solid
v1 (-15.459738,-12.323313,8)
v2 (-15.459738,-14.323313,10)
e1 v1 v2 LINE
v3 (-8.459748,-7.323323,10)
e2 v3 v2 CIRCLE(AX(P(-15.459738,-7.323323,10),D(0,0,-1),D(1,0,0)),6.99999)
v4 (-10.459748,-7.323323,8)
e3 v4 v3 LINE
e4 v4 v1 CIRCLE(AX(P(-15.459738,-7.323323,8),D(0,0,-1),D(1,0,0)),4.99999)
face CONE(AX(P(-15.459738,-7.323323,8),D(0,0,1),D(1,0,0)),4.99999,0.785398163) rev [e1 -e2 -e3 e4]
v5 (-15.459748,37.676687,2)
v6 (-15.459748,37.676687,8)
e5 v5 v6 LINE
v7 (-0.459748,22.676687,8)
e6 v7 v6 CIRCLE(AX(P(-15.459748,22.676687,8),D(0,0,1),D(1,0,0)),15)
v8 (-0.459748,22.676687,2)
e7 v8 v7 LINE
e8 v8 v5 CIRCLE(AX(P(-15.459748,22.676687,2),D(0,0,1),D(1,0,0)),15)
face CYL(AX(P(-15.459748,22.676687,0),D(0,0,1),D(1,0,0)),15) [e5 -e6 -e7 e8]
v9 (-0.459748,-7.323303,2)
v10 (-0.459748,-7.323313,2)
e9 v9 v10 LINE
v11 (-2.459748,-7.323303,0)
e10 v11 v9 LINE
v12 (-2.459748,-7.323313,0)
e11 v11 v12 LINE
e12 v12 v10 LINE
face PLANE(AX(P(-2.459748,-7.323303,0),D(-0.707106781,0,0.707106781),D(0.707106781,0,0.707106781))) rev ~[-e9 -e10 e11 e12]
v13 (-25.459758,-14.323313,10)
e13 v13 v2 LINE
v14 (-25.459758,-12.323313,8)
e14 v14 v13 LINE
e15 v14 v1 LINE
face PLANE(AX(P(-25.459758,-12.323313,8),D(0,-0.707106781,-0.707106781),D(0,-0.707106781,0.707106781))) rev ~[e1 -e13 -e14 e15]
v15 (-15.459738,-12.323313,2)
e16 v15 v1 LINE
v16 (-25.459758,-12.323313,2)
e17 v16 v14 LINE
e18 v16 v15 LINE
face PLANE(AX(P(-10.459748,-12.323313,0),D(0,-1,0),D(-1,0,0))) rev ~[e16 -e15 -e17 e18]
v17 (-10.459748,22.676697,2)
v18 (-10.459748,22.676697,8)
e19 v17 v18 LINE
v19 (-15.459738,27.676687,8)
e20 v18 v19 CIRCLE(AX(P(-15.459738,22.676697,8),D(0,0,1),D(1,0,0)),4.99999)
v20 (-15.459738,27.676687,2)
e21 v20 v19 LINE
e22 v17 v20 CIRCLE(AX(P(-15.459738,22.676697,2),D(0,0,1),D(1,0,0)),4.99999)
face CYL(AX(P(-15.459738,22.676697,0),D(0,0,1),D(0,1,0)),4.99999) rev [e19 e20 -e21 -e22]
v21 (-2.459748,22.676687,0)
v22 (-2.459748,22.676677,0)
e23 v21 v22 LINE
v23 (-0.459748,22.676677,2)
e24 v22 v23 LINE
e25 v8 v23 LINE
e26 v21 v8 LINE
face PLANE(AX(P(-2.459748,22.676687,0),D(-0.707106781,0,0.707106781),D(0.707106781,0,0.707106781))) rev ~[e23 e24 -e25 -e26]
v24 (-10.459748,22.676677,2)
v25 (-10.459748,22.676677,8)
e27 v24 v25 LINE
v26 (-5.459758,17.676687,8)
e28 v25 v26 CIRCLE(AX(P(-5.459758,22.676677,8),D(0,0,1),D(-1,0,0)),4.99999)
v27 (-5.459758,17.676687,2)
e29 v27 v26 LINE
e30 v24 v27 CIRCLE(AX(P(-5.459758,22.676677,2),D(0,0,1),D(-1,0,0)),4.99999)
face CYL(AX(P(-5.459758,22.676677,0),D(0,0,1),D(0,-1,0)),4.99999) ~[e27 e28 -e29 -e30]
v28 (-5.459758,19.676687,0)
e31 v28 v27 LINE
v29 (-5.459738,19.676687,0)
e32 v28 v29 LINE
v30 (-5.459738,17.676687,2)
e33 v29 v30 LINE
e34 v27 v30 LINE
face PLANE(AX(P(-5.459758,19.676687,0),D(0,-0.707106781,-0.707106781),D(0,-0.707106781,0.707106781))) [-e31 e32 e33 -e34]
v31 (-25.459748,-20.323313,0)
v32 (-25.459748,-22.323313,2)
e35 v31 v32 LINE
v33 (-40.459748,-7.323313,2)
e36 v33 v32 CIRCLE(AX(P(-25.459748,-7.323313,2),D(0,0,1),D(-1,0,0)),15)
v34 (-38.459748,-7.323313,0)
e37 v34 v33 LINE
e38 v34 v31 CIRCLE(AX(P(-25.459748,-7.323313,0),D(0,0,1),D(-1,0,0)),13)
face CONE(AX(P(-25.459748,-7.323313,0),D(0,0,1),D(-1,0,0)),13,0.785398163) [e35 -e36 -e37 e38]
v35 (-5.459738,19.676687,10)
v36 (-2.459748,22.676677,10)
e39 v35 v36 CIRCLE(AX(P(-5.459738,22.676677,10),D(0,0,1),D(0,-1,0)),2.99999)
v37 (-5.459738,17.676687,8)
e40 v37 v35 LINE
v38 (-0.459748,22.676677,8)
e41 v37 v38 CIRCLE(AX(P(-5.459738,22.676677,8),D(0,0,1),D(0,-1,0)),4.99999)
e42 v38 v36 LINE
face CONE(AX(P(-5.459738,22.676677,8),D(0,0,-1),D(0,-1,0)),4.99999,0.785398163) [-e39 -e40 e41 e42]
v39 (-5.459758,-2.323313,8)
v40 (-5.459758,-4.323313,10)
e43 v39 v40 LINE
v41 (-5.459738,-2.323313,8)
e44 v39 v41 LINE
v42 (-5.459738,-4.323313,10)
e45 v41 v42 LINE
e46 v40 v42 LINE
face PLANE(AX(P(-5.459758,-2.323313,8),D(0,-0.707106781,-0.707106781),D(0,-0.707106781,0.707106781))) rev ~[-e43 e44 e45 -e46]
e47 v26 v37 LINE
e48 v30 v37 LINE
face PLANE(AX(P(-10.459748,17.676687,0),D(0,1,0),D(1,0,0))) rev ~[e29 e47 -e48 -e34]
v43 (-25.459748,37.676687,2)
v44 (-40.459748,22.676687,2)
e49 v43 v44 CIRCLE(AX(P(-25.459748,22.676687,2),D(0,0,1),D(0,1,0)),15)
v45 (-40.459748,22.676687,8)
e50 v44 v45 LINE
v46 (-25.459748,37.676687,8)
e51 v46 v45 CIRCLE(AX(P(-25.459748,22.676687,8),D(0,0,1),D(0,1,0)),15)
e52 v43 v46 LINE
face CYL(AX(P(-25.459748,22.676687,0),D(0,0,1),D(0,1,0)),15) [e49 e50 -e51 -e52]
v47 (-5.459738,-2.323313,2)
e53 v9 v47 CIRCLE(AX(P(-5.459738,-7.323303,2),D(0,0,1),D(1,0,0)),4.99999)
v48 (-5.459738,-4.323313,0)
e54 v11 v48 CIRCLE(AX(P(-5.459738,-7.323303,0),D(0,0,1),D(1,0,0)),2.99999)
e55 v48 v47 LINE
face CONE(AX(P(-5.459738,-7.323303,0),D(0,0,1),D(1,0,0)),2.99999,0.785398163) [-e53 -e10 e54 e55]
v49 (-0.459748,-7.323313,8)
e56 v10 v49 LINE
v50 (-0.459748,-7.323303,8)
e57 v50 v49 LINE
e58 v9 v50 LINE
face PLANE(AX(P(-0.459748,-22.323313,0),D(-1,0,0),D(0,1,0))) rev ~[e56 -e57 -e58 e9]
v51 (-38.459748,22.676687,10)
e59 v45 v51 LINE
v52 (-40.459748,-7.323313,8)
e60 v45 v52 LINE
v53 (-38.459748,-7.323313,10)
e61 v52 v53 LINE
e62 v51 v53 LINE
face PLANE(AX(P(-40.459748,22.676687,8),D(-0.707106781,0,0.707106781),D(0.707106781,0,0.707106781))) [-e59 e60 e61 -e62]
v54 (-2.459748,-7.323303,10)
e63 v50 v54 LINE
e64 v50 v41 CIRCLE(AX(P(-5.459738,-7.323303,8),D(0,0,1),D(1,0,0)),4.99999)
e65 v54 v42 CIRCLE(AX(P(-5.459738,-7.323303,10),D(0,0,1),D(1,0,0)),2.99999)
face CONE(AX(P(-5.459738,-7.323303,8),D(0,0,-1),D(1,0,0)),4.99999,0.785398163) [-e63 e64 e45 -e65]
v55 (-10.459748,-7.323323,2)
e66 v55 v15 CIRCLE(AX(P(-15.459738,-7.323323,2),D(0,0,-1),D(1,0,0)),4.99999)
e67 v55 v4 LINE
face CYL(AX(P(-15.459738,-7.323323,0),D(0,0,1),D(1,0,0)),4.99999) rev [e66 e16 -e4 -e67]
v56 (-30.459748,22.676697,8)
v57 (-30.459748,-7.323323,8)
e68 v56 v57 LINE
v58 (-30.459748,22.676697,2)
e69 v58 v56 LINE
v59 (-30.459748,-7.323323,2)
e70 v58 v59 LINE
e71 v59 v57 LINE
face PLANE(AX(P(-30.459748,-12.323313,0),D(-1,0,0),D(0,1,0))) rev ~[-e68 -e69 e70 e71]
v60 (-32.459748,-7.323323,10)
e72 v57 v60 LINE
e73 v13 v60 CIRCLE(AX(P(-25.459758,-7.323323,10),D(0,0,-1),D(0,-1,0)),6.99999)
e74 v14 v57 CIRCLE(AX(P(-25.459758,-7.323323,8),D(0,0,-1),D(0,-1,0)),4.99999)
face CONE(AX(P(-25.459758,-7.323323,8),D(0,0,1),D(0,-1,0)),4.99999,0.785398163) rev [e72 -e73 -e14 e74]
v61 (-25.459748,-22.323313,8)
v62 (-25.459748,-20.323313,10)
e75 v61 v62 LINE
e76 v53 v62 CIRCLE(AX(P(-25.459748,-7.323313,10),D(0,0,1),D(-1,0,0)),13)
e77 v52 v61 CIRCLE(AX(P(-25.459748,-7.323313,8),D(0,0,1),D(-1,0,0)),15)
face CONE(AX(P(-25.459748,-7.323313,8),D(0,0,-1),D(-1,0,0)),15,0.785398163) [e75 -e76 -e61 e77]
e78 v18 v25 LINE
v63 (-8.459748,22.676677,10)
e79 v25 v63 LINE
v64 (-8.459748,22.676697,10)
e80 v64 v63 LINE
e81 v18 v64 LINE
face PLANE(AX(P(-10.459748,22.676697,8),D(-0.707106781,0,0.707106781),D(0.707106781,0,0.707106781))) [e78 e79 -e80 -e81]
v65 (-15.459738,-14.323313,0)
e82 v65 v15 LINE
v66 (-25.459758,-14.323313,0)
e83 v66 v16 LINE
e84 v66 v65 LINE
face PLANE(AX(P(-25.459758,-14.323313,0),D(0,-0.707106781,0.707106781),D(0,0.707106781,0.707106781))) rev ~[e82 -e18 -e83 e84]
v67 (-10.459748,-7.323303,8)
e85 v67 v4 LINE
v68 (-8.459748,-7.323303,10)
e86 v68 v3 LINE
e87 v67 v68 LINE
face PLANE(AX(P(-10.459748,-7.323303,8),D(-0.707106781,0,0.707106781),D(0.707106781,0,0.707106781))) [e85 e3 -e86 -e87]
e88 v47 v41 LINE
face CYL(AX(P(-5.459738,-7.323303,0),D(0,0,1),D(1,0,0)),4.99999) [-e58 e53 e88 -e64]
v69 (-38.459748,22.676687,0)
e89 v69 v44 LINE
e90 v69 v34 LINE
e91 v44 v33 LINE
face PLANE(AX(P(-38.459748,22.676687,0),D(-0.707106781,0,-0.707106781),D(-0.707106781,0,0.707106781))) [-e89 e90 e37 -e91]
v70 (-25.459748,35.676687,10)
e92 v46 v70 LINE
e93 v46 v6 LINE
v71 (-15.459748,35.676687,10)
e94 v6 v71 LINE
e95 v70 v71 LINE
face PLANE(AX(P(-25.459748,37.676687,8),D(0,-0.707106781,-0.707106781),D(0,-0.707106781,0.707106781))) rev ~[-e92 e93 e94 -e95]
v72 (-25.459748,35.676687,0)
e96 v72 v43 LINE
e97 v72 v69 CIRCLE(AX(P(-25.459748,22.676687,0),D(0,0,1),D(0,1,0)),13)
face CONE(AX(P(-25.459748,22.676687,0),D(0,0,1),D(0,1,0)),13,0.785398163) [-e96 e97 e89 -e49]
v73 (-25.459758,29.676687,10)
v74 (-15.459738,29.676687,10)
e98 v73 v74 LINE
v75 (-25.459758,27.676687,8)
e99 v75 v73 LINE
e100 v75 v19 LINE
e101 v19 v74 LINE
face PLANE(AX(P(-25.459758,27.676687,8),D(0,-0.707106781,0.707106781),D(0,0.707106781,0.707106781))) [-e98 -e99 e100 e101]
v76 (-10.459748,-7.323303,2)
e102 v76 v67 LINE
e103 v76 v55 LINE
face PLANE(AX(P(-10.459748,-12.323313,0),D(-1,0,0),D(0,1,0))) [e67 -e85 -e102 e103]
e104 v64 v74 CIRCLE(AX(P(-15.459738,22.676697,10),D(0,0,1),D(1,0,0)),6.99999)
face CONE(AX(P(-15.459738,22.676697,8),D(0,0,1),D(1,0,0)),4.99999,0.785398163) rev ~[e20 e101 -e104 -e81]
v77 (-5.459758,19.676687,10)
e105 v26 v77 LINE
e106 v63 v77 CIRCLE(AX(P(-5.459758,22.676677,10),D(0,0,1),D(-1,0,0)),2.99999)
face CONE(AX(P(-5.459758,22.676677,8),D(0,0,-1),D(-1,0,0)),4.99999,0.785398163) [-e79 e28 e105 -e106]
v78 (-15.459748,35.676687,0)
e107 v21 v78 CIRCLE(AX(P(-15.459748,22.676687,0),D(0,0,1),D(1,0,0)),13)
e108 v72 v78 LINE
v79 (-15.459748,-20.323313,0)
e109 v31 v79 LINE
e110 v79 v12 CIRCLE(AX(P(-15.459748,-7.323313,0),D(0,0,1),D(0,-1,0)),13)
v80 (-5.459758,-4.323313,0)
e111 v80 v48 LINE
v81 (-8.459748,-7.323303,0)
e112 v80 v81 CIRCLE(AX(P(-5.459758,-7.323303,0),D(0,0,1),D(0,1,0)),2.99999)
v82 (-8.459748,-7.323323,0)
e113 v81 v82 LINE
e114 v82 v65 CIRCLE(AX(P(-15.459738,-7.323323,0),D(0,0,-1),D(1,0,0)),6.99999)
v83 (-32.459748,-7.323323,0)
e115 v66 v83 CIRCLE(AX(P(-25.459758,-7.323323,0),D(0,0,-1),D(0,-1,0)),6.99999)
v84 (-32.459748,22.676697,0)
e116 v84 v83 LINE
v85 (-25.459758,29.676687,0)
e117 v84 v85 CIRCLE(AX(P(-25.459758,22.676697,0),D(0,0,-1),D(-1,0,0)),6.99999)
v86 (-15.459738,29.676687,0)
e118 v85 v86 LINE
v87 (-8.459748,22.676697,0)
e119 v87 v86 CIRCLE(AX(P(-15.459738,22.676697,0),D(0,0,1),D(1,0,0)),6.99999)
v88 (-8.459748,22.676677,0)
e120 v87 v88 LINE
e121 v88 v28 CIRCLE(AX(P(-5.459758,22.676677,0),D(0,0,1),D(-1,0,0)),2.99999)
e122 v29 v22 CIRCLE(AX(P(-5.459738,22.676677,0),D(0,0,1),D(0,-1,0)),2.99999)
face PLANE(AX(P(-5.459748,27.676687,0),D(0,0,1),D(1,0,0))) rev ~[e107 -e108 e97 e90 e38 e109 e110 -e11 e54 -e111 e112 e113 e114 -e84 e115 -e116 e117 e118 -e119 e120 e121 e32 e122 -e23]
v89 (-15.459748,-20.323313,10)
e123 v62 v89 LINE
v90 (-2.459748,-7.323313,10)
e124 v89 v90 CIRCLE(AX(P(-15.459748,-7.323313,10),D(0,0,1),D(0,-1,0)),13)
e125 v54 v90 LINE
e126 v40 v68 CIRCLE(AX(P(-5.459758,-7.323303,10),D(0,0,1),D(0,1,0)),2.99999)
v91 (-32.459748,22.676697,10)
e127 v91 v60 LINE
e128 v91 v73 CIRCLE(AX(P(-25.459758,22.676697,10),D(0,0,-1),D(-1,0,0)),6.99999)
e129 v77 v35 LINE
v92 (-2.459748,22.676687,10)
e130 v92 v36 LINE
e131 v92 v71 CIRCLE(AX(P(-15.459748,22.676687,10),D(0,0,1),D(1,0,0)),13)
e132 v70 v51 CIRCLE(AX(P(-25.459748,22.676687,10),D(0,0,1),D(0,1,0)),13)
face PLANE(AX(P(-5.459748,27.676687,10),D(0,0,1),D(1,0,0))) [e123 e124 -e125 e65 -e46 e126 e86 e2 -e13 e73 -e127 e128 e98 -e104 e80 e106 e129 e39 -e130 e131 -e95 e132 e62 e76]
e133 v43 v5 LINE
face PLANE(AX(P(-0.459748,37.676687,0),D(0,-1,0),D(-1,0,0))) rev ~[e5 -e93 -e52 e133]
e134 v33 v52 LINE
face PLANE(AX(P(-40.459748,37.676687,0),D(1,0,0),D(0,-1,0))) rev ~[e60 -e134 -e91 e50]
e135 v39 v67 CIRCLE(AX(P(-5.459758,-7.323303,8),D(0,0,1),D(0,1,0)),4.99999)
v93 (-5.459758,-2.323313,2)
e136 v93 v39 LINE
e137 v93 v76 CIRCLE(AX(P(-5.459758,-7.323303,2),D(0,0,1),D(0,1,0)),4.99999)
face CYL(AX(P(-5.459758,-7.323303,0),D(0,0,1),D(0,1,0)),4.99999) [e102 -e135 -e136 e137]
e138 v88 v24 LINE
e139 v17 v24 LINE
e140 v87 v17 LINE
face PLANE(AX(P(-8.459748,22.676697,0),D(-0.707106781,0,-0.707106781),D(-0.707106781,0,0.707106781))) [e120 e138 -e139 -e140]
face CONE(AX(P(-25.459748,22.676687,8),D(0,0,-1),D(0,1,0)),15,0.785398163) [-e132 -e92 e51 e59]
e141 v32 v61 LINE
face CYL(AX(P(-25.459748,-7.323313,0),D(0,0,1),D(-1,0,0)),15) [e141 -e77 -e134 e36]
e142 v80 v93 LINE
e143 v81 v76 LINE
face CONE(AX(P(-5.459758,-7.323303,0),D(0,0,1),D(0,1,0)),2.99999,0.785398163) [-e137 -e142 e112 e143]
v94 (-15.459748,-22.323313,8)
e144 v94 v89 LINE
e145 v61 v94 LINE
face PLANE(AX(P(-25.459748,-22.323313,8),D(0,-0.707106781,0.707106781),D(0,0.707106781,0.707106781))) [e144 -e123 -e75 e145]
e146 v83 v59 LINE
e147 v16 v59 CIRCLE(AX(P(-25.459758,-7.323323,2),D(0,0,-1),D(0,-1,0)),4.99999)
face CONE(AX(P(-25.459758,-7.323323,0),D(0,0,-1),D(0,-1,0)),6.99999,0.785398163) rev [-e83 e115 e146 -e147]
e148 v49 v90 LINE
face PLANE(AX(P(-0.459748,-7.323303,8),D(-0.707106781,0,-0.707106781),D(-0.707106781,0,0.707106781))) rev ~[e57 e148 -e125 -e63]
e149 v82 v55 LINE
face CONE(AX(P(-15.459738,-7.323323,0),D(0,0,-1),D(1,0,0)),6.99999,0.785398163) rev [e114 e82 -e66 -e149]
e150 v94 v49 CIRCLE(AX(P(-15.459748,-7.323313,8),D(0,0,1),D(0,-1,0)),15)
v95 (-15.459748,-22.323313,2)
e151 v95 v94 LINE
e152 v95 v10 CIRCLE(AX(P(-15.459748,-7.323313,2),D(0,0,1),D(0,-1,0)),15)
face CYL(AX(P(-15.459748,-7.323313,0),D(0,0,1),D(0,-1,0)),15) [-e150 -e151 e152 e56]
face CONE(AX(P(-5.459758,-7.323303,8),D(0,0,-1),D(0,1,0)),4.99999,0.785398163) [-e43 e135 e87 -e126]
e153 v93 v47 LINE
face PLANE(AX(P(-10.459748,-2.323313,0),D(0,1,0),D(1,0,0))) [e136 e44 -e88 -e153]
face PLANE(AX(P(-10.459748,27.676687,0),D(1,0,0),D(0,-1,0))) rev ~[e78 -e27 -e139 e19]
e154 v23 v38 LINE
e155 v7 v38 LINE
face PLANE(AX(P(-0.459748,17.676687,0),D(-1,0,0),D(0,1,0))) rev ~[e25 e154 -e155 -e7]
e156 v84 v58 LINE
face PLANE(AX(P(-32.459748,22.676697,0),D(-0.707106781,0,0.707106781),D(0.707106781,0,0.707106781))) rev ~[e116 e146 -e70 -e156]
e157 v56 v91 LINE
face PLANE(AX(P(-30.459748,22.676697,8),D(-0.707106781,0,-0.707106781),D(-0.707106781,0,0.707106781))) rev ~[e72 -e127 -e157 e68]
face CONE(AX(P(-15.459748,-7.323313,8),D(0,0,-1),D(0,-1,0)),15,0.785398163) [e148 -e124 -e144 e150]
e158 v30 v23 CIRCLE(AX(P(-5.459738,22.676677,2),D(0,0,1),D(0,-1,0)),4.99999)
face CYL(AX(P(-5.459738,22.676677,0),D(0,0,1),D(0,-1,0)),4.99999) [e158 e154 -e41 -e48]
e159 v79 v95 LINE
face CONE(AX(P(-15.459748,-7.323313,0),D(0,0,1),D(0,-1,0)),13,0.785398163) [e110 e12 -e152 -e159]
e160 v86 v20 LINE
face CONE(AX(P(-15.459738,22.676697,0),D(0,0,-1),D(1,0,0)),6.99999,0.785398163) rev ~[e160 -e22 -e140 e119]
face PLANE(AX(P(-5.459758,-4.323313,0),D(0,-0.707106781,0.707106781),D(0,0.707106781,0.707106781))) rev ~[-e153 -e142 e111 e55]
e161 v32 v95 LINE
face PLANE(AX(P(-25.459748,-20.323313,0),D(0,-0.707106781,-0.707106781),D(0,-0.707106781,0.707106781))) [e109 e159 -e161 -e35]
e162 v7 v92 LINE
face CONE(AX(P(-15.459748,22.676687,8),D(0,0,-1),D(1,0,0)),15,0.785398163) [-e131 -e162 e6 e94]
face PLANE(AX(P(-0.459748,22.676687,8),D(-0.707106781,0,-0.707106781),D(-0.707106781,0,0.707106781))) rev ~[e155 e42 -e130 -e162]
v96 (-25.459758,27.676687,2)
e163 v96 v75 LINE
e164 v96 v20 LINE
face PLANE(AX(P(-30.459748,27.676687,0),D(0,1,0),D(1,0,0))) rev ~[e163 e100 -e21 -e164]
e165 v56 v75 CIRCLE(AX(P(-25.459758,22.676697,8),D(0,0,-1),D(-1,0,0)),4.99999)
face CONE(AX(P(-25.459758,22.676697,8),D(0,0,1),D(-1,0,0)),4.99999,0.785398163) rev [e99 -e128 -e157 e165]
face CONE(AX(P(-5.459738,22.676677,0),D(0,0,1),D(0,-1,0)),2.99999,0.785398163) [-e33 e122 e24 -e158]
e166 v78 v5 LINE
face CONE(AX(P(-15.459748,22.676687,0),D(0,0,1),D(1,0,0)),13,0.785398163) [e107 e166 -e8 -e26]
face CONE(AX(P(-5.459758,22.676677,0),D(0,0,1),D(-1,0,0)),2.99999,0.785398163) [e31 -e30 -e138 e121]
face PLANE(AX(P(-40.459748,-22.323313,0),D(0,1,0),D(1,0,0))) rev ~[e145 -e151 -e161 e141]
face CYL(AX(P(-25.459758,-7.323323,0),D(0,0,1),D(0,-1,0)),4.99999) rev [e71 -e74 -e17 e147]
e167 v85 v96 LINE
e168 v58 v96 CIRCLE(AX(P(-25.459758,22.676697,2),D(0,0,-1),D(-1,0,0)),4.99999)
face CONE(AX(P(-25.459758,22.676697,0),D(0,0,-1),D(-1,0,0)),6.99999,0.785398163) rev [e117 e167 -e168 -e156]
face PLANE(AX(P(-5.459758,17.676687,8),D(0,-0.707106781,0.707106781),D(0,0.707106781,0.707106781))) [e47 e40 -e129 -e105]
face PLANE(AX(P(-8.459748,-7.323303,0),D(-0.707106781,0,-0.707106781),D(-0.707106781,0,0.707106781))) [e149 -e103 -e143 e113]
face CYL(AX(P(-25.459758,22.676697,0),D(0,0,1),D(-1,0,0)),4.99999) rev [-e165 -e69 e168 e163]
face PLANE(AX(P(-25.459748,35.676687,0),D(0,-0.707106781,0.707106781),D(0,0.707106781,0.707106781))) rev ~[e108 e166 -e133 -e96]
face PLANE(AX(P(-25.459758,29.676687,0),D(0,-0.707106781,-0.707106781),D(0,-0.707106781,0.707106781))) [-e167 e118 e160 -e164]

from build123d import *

# Parameters (mm, degrees)
F0_W         = 10
F0_H         = 10
F1_DEPTH     = 10
F2_R         = 4.99999
F3_R         = 15
F4_T1_DEPTH  = 30.00002
F4_T3_DEPTH  = 10
F4_T5_DEPTH  = 1e-05
F4_T7_DEPTH  = 2e-05
F4_T9_DEPTH  = 2e-05
F4_T11_DEPTH = 10.00002
F4_T13_DEPTH = 2e-05
F4_T15_DEPTH = 1e-05
F4_T17_DEPTH = 30
F4_T20_ANGLE = 90
F4_T22_ANGLE = 90
F4_T24_ANGLE = 90
F4_T26_ANGLE = 90
F4_T28_ANGLE = 90
F4_T30_ANGLE = 90
F4_T32_ANGLE = 90
F4_T34_ANGLE = 90
F4_T36_ANGLE = 90
F4_T38_ANGLE = 90
F4_T40_ANGLE = 90
F4_T42_ANGLE = 90
F4_T44_ANGLE = 90
F4_T46_ANGLE = 90
F4_T48_ANGLE = 90
F4_T50_ANGLE = 90
F4_T52_ANGLE = 90
F4_T54_ANGLE = 90
F4_T56_ANGLE = 90
F4_T58_ANGLE = 90
F4_T60_ANGLE = 90
F4_T62_ANGLE = 90
F4_T64_ANGLE = 90
F4_T66_ANGLE = 90


# Not quite as in the source:
# - a fillet or chamfer that OpenCascade refuses, or shapes differently, is made with other operations: its cross-section is extruded or revolved along the edge and cut away or added
# - a fillet or chamfer is up to 0.001 mm smaller than in the source, because OpenCascade refuses the exact size


with BuildPart() as f1:
    # F0 (on Top) → F1 (new body)
    with BuildSketch(Plane.XY):
        Polygon((-10.4597477218, 27.6766866998), (-10.4597477218, 17.6766866998), (-0.4597477218, 17.6766866998), (-0.4597477218, 37.6766866998), (-10.4597477218, 37.6766866998), align=None)
        Polygon((-30.4597477218, 27.6766866998), (-10.4597477218, 27.6766866998), (-10.4597477218, 37.6766866998), (-40.4597477218, 37.6766866998), (-40.4597477218, 27.6766866998), align=None)
        Polygon((-30.4597477218, -12.3233133002), (-30.4597477218, 27.6766866998), (-40.4597477218, 27.6766866998), (-40.4597477218, -22.3233133002), (-30.4597477218, -22.3233133002), align=None)
        Polygon((-10.4597477218, -12.3233133002), (-30.4597477218, -12.3233133002), (-30.4597477218, -22.3233133002), (-0.4597477218, -22.3233133002), (-0.4597477218, -12.3233133002), align=None)
        with Locations((-5.4597477218, -7.3233133002)):
            Rectangle(F0_W, F0_H)
    extrude(amount=F1_DEPTH)

    # F2 (radius 5 in the source; OpenCascade refuses exactly that, so slightly less here)
    f2_edges = [f1.edges().sort_by_distance(p)[0] for p in [
        (-0.459748, 17.676687, 5),
        (-10.459748, 17.676687, 5),
        (-10.459748, 27.676687, 5),
        (-30.459748, 27.676687, 5),
        (-30.459748, -12.323313, 5),
        (-10.459748, -12.323313, 5),
        (-10.459748, -2.323313, 5),
        (-0.459748, -2.323313, 5),
    ]]
    fillet(f2_edges, radius=F2_R)

    # F3
    f3_edges = [f1.edges().sort_by_distance(p)[0] for p in [
        (-0.459748, 37.676687, 5),
        (-40.459748, 37.676687, 5),
        (-0.459748, -22.323313, 5),
        (-40.459748, -22.323313, 5),
    ]]
    fillet(f3_edges, radius=F3_R)

    # F4: chamfer of 2 on 2 edges, made by hand

    # F4_s2 → F4_t1 (cut)
    with BuildSketch(Plane.XZ.offset(-22.6766966998)):
        Polygon((-30.4597477218, 8), (-32.4597477218, 10), (-30.4597477218, 10), align=None)
        Polygon((-32.4597477218, 0), (-30.4597477218, 2), (-30.4597477218, 0), align=None)
    extrude(amount=F4_T1_DEPTH, mode=Mode.SUBTRACT)

    # F4_s4 → F4_t3 (cut)
    with BuildSketch(Plane.YZ.offset(-25.4597477218)):
        Polygon((-20.3233133002, 0), (-22.3233133002, 2), (-22.3233133002, 0), align=None)
        Polygon((35.6766866998, 0), (37.6766866998, 2), (37.6766866998, 0), align=None)
        Polygon((37.6766866998, 8), (35.6766866998, 10), (37.6766866998, 10), align=None)
        Polygon((-22.3233133002, 8), (-20.3233133002, 10), (-22.3233133002, 10), align=None)
    extrude(amount=F4_T3_DEPTH, mode=Mode.SUBTRACT)

    # F4_s6 → F4_t5 (cut)
    with BuildSketch(Plane.XZ.offset(7.3233033002)):
        Polygon((-2.4597477218, 0), (-0.4597477218, 2), (-0.4597477218, 0), align=None)
        Polygon((-0.4597477218, 8), (-2.4597477218, 10), (-0.4597477218, 10), align=None)
    extrude(amount=F4_T5_DEPTH, mode=Mode.SUBTRACT)

    # F4_s8 → F4_t7 (cut)
    with BuildSketch(Plane.YZ.offset(-5.4597577218)):
        Polygon((-4.3233133002, 0), (-2.3233133002, 2), (-2.3233133002, 0), align=None)
        Polygon((19.6766866998, 0), (17.6766866998, 2), (17.6766866998, 0), align=None)
        Polygon((17.6766866998, 8), (19.6766866998, 10), (17.6766866998, 10), align=None)
        Polygon((-2.3233133002, 8), (-4.3233133002, 10), (-2.3233133002, 10), align=None)
    extrude(amount=F4_T7_DEPTH, mode=Mode.SUBTRACT)

    # F4_s10 → F4_t9 (cut)
    with BuildSketch(Plane.XZ.offset(7.3233033002)):
        Polygon((-8.4597477218, 0), (-10.4597477218, 2), (-10.4597477218, 0), align=None)
        Polygon((-10.4597477218, 8), (-8.4597477218, 10), (-10.4597477218, 10), align=None)
    extrude(amount=F4_T9_DEPTH, mode=Mode.SUBTRACT)

    # F4_s12 → F4_t11 (cut)
    with BuildSketch(Plane.YZ.offset(-25.4597577218)):
        Polygon((-14.3233133002, 0), (-12.3233133002, 2), (-12.3233133002, 0), align=None)
        Polygon((29.6766866998, 0), (27.6766866998, 2), (27.6766866998, 0), align=None)
        Polygon((27.6766866998, 8), (29.6766866998, 10), (27.6766866998, 10), align=None)
        Polygon((-12.3233133002, 8), (-14.3233133002, 10), (-12.3233133002, 10), align=None)
    extrude(amount=F4_T11_DEPTH, mode=Mode.SUBTRACT)

    # F4_s14 → F4_t13 (cut)
    with BuildSketch(Plane.XZ.offset(-22.6766966998)):
        Polygon((-8.4597477218, 0), (-10.4597477218, 2), (-10.4597477218, 0), align=None)
        Polygon((-10.4597477218, 8), (-8.4597477218, 10), (-10.4597477218, 10), align=None)
    extrude(amount=F4_T13_DEPTH, mode=Mode.SUBTRACT)

    # F4_s16 → F4_t15 (cut)
    with BuildSketch(Plane.XZ.offset(-22.6766866998)):
        Polygon((-2.4597477218, 0), (-0.4597477218, 2), (-0.4597477218, 0), align=None)
        Polygon((-0.4597477218, 8), (-2.4597477218, 10), (-0.4597477218, 10), align=None)
    extrude(amount=F4_T15_DEPTH, mode=Mode.SUBTRACT)

    # F4_s18 → F4_t17 (cut)
    with BuildSketch(Plane.XZ.offset(-22.6766866998)):
        Polygon((-38.4597477218, 0), (-40.4597477218, 2), (-40.4597477218, 0), align=None)
        Polygon((-40.4597477218, 8), (-38.4597477218, 10), (-40.4597477218, 10), align=None)
    extrude(amount=F4_T17_DEPTH, mode=Mode.SUBTRACT)

    # F4_s19 → F4_t20 (revolve, cut)
    with BuildSketch(Plane.YZ.offset(-15.4597477218)):
        Polygon((-20.3233133002, 0), (-22.3233133002, 2), (-22.3233133002, 0), align=None)
    revolve(axis=Axis((-15.4597477218, -7.3233133002, 0), (0, 0, 1)), revolution_arc=F4_T20_ANGLE, mode=Mode.SUBTRACT)

    # F4_s21 → F4_t22 (revolve, cut)
    with BuildSketch(Plane.XZ.offset(7.3233033002)):
        Polygon((-2.4597477218, 0), (-0.4597477218, 2), (-0.4597477218, 0), align=None)
    revolve(axis=Axis((-5.4597377218, -7.3233033002, 0), (0, 0, 1)), revolution_arc=F4_T22_ANGLE, mode=Mode.SUBTRACT)

    # F4_s23 → F4_t24 (revolve, cut)
    with BuildSketch(Plane.YZ.offset(-5.4597577218)):
        Polygon((-4.3233133002, 0), (-2.3233133002, 2), (-2.3233133002, 0), align=None)
    revolve(axis=Axis((-5.4597577218, -7.3233033002, 0), (0, 0, 1)), revolution_arc=F4_T24_ANGLE, mode=Mode.SUBTRACT)

    # F4_s25 → F4_t26 (revolve, cut)
    with BuildSketch(Plane.XZ.offset(7.3233233002)):
        Polygon((-8.4597477218, 0), (-10.4597477218, 2), (-10.4597477218, 0), align=None)
    revolve(axis=Axis((-15.4597377218, -7.3233233002, 0), (0, 0, -1)), revolution_arc=F4_T26_ANGLE, mode=Mode.SUBTRACT)

    # F4_s27 → F4_t28 (revolve, cut)
    with BuildSketch(Plane.YZ.offset(-25.4597577218)):
        Polygon((-14.3233133002, 0), (-12.3233133002, 2), (-12.3233133002, 0), align=None)
    revolve(axis=Axis((-25.4597577218, -7.3233233002, 0), (0, 0, -1)), revolution_arc=F4_T28_ANGLE, mode=Mode.SUBTRACT)

    # F4_s29 → F4_t30 (revolve, cut)
    with BuildSketch(Plane.XZ.offset(-22.6766966998)):
        Polygon((-32.4597477218, 0), (-30.4597477218, 2), (-30.4597477218, 0), align=None)
    revolve(axis=Axis((-25.4597577218, 22.6766966998, 0), (0, 0, -1)), revolution_arc=F4_T30_ANGLE, mode=Mode.SUBTRACT)

    # F4_s31 → F4_t32 (revolve, cut)
    with BuildSketch(Plane.XZ.offset(-22.6766966998)):
        Polygon((-8.4597477218, 0), (-10.4597477218, 2), (-10.4597477218, 0), align=None)
    revolve(axis=Axis((-15.4597377218, 22.6766966998, 0), (0, 0, 1)), revolution_arc=F4_T32_ANGLE, mode=Mode.SUBTRACT)

    # F4_s33 → F4_t34 (revolve, cut)
    with BuildSketch(Plane.XZ.offset(-22.6766766998)):
        Polygon((-8.4597477218, 0), (-10.4597477218, 2), (-10.4597477218, 0), align=None)
    revolve(axis=Axis((-5.4597577218, 22.6766766998, 0), (0, 0, 1)), revolution_arc=F4_T34_ANGLE, mode=Mode.SUBTRACT)

    # F4_s35 → F4_t36 (revolve, cut)
    with BuildSketch(Plane.YZ.offset(-5.4597377218)):
        Polygon((19.6766866998, 0), (17.6766866998, 2), (17.6766866998, 0), align=None)
    revolve(axis=Axis((-5.4597377218, 22.6766766998, 0), (0, 0, 1)), revolution_arc=F4_T36_ANGLE, mode=Mode.SUBTRACT)

    # F4_s37 → F4_t38 (revolve, cut)
    with BuildSketch(Plane.XZ.offset(-22.6766866998)):
        Polygon((-2.4597477218, 0), (-0.4597477218, 2), (-0.4597477218, 0), align=None)
    revolve(axis=Axis((-15.4597477218, 22.6766866998, 0), (0, 0, 1)), revolution_arc=F4_T38_ANGLE, mode=Mode.SUBTRACT)

    # F4_s39 → F4_t40 (revolve, cut)
    with BuildSketch(Plane.YZ.offset(-25.4597477218)):
        Polygon((35.6766866998, 0), (37.6766866998, 2), (37.6766866998, 0), align=None)
    revolve(axis=Axis((-25.4597477218, 22.6766866998, 0), (0, 0, 1)), revolution_arc=F4_T40_ANGLE, mode=Mode.SUBTRACT)

    # F4_s41 → F4_t42 (revolve, cut)
    with BuildSketch(Plane.XZ.offset(7.3233133002)):
        Polygon((-38.4597477218, 0), (-40.4597477218, 2), (-40.4597477218, 0), align=None)
    revolve(axis=Axis((-25.4597477218, -7.3233133002, 0), (0, 0, 1)), revolution_arc=F4_T42_ANGLE, mode=Mode.SUBTRACT)

    # F4_s43 → F4_t44 (revolve, cut)
    with BuildSketch(Plane.YZ.offset(-25.4597577218)):
        Polygon((-12.3233133002, 8), (-14.3233133002, 10), (-12.3233133002, 10), align=None)
    revolve(axis=Axis((-25.4597577218, -7.3233233002, 10), (0, 0, -1)), revolution_arc=F4_T44_ANGLE, mode=Mode.SUBTRACT)

    # F4_s45 → F4_t46 (revolve, cut)
    with BuildSketch(Plane.XZ.offset(-22.6766966998)):
        Polygon((-30.4597477218, 8), (-32.4597477218, 10), (-30.4597477218, 10), align=None)
    revolve(axis=Axis((-25.4597577218, 22.6766966998, 10), (0, 0, -1)), revolution_arc=F4_T46_ANGLE, mode=Mode.SUBTRACT)

    # F4_s47 → F4_t48 (revolve, cut)
    with BuildSketch(Plane.XZ.offset(-22.6766966998)):
        Polygon((-10.4597477218, 8), (-8.4597477218, 10), (-10.4597477218, 10), align=None)
    revolve(axis=Axis((-15.4597377218, 22.6766966998, 10), (0, 0, 1)), revolution_arc=F4_T48_ANGLE, mode=Mode.SUBTRACT)

    # F4_s49 → F4_t50 (revolve, cut)
    with BuildSketch(Plane.XZ.offset(-22.6766766998)):
        Polygon((-10.4597477218, 8), (-8.4597477218, 10), (-10.4597477218, 10), align=None)
    revolve(axis=Axis((-5.4597577218, 22.6766766998, 10), (0, 0, 1)), revolution_arc=F4_T50_ANGLE, mode=Mode.SUBTRACT)

    # F4_s51 → F4_t52 (revolve, cut)
    with BuildSketch(Plane.YZ.offset(-5.4597377218)):
        Polygon((17.6766866998, 8), (19.6766866998, 10), (17.6766866998, 10), align=None)
    revolve(axis=Axis((-5.4597377218, 22.6766766998, 10), (0, 0, 1)), revolution_arc=F4_T52_ANGLE, mode=Mode.SUBTRACT)

    # F4_s53 → F4_t54 (revolve, cut)
    with BuildSketch(Plane.XZ.offset(-22.6766866998)):
        Polygon((-0.4597477218, 8), (-2.4597477218, 10), (-0.4597477218, 10), align=None)
    revolve(axis=Axis((-15.4597477218, 22.6766866998, 10), (0, 0, 1)), revolution_arc=F4_T54_ANGLE, mode=Mode.SUBTRACT)

    # F4_s55 → F4_t56 (revolve, cut)
    with BuildSketch(Plane.YZ.offset(-25.4597477218)):
        Polygon((37.6766866998, 8), (35.6766866998, 10), (37.6766866998, 10), align=None)
    revolve(axis=Axis((-25.4597477218, 22.6766866998, 10), (0, 0, 1)), revolution_arc=F4_T56_ANGLE, mode=Mode.SUBTRACT)

    # F4_s57 → F4_t58 (revolve, cut)
    with BuildSketch(Plane.XZ.offset(7.3233133002)):
        Polygon((-40.4597477218, 8), (-38.4597477218, 10), (-40.4597477218, 10), align=None)
    revolve(axis=Axis((-25.4597477218, -7.3233133002, 10), (0, 0, 1)), revolution_arc=F4_T58_ANGLE, mode=Mode.SUBTRACT)

    # F4_s59 → F4_t60 (revolve, cut)
    with BuildSketch(Plane.YZ.offset(-15.4597477218)):
        Polygon((-22.3233133002, 8), (-20.3233133002, 10), (-22.3233133002, 10), align=None)
    revolve(axis=Axis((-15.4597477218, -7.3233133002, 10), (0, 0, 1)), revolution_arc=F4_T60_ANGLE, mode=Mode.SUBTRACT)

    # F4_s61 → F4_t62 (revolve, cut)
    with BuildSketch(Plane.XZ.offset(7.3233033002)):
        Polygon((-0.4597477218, 8), (-2.4597477218, 10), (-0.4597477218, 10), align=None)
    revolve(axis=Axis((-5.4597377218, -7.3233033002, 10), (0, 0, 1)), revolution_arc=F4_T62_ANGLE, mode=Mode.SUBTRACT)

    # F4_s63 → F4_t64 (revolve, cut)
    with BuildSketch(Plane.YZ.offset(-5.4597577218)):
        Polygon((-2.3233133002, 8), (-4.3233133002, 10), (-2.3233133002, 10), align=None)
    revolve(axis=Axis((-5.4597577218, -7.3233033002, 10), (0, 0, 1)), revolution_arc=F4_T64_ANGLE, mode=Mode.SUBTRACT)

    # F4_s65 → F4_t66 (revolve, cut)
    with BuildSketch(Plane.XZ.offset(7.3233233002)):
        Polygon((-10.4597477218, 8), (-8.4597477218, 10), (-10.4597477218, 10), align=None)
    revolve(axis=Axis((-15.4597377218, -7.3233233002, 10), (0, 0, -1)), revolution_arc=F4_T66_ANGLE, mode=Mode.SUBTRACT)


solid = f1.part
